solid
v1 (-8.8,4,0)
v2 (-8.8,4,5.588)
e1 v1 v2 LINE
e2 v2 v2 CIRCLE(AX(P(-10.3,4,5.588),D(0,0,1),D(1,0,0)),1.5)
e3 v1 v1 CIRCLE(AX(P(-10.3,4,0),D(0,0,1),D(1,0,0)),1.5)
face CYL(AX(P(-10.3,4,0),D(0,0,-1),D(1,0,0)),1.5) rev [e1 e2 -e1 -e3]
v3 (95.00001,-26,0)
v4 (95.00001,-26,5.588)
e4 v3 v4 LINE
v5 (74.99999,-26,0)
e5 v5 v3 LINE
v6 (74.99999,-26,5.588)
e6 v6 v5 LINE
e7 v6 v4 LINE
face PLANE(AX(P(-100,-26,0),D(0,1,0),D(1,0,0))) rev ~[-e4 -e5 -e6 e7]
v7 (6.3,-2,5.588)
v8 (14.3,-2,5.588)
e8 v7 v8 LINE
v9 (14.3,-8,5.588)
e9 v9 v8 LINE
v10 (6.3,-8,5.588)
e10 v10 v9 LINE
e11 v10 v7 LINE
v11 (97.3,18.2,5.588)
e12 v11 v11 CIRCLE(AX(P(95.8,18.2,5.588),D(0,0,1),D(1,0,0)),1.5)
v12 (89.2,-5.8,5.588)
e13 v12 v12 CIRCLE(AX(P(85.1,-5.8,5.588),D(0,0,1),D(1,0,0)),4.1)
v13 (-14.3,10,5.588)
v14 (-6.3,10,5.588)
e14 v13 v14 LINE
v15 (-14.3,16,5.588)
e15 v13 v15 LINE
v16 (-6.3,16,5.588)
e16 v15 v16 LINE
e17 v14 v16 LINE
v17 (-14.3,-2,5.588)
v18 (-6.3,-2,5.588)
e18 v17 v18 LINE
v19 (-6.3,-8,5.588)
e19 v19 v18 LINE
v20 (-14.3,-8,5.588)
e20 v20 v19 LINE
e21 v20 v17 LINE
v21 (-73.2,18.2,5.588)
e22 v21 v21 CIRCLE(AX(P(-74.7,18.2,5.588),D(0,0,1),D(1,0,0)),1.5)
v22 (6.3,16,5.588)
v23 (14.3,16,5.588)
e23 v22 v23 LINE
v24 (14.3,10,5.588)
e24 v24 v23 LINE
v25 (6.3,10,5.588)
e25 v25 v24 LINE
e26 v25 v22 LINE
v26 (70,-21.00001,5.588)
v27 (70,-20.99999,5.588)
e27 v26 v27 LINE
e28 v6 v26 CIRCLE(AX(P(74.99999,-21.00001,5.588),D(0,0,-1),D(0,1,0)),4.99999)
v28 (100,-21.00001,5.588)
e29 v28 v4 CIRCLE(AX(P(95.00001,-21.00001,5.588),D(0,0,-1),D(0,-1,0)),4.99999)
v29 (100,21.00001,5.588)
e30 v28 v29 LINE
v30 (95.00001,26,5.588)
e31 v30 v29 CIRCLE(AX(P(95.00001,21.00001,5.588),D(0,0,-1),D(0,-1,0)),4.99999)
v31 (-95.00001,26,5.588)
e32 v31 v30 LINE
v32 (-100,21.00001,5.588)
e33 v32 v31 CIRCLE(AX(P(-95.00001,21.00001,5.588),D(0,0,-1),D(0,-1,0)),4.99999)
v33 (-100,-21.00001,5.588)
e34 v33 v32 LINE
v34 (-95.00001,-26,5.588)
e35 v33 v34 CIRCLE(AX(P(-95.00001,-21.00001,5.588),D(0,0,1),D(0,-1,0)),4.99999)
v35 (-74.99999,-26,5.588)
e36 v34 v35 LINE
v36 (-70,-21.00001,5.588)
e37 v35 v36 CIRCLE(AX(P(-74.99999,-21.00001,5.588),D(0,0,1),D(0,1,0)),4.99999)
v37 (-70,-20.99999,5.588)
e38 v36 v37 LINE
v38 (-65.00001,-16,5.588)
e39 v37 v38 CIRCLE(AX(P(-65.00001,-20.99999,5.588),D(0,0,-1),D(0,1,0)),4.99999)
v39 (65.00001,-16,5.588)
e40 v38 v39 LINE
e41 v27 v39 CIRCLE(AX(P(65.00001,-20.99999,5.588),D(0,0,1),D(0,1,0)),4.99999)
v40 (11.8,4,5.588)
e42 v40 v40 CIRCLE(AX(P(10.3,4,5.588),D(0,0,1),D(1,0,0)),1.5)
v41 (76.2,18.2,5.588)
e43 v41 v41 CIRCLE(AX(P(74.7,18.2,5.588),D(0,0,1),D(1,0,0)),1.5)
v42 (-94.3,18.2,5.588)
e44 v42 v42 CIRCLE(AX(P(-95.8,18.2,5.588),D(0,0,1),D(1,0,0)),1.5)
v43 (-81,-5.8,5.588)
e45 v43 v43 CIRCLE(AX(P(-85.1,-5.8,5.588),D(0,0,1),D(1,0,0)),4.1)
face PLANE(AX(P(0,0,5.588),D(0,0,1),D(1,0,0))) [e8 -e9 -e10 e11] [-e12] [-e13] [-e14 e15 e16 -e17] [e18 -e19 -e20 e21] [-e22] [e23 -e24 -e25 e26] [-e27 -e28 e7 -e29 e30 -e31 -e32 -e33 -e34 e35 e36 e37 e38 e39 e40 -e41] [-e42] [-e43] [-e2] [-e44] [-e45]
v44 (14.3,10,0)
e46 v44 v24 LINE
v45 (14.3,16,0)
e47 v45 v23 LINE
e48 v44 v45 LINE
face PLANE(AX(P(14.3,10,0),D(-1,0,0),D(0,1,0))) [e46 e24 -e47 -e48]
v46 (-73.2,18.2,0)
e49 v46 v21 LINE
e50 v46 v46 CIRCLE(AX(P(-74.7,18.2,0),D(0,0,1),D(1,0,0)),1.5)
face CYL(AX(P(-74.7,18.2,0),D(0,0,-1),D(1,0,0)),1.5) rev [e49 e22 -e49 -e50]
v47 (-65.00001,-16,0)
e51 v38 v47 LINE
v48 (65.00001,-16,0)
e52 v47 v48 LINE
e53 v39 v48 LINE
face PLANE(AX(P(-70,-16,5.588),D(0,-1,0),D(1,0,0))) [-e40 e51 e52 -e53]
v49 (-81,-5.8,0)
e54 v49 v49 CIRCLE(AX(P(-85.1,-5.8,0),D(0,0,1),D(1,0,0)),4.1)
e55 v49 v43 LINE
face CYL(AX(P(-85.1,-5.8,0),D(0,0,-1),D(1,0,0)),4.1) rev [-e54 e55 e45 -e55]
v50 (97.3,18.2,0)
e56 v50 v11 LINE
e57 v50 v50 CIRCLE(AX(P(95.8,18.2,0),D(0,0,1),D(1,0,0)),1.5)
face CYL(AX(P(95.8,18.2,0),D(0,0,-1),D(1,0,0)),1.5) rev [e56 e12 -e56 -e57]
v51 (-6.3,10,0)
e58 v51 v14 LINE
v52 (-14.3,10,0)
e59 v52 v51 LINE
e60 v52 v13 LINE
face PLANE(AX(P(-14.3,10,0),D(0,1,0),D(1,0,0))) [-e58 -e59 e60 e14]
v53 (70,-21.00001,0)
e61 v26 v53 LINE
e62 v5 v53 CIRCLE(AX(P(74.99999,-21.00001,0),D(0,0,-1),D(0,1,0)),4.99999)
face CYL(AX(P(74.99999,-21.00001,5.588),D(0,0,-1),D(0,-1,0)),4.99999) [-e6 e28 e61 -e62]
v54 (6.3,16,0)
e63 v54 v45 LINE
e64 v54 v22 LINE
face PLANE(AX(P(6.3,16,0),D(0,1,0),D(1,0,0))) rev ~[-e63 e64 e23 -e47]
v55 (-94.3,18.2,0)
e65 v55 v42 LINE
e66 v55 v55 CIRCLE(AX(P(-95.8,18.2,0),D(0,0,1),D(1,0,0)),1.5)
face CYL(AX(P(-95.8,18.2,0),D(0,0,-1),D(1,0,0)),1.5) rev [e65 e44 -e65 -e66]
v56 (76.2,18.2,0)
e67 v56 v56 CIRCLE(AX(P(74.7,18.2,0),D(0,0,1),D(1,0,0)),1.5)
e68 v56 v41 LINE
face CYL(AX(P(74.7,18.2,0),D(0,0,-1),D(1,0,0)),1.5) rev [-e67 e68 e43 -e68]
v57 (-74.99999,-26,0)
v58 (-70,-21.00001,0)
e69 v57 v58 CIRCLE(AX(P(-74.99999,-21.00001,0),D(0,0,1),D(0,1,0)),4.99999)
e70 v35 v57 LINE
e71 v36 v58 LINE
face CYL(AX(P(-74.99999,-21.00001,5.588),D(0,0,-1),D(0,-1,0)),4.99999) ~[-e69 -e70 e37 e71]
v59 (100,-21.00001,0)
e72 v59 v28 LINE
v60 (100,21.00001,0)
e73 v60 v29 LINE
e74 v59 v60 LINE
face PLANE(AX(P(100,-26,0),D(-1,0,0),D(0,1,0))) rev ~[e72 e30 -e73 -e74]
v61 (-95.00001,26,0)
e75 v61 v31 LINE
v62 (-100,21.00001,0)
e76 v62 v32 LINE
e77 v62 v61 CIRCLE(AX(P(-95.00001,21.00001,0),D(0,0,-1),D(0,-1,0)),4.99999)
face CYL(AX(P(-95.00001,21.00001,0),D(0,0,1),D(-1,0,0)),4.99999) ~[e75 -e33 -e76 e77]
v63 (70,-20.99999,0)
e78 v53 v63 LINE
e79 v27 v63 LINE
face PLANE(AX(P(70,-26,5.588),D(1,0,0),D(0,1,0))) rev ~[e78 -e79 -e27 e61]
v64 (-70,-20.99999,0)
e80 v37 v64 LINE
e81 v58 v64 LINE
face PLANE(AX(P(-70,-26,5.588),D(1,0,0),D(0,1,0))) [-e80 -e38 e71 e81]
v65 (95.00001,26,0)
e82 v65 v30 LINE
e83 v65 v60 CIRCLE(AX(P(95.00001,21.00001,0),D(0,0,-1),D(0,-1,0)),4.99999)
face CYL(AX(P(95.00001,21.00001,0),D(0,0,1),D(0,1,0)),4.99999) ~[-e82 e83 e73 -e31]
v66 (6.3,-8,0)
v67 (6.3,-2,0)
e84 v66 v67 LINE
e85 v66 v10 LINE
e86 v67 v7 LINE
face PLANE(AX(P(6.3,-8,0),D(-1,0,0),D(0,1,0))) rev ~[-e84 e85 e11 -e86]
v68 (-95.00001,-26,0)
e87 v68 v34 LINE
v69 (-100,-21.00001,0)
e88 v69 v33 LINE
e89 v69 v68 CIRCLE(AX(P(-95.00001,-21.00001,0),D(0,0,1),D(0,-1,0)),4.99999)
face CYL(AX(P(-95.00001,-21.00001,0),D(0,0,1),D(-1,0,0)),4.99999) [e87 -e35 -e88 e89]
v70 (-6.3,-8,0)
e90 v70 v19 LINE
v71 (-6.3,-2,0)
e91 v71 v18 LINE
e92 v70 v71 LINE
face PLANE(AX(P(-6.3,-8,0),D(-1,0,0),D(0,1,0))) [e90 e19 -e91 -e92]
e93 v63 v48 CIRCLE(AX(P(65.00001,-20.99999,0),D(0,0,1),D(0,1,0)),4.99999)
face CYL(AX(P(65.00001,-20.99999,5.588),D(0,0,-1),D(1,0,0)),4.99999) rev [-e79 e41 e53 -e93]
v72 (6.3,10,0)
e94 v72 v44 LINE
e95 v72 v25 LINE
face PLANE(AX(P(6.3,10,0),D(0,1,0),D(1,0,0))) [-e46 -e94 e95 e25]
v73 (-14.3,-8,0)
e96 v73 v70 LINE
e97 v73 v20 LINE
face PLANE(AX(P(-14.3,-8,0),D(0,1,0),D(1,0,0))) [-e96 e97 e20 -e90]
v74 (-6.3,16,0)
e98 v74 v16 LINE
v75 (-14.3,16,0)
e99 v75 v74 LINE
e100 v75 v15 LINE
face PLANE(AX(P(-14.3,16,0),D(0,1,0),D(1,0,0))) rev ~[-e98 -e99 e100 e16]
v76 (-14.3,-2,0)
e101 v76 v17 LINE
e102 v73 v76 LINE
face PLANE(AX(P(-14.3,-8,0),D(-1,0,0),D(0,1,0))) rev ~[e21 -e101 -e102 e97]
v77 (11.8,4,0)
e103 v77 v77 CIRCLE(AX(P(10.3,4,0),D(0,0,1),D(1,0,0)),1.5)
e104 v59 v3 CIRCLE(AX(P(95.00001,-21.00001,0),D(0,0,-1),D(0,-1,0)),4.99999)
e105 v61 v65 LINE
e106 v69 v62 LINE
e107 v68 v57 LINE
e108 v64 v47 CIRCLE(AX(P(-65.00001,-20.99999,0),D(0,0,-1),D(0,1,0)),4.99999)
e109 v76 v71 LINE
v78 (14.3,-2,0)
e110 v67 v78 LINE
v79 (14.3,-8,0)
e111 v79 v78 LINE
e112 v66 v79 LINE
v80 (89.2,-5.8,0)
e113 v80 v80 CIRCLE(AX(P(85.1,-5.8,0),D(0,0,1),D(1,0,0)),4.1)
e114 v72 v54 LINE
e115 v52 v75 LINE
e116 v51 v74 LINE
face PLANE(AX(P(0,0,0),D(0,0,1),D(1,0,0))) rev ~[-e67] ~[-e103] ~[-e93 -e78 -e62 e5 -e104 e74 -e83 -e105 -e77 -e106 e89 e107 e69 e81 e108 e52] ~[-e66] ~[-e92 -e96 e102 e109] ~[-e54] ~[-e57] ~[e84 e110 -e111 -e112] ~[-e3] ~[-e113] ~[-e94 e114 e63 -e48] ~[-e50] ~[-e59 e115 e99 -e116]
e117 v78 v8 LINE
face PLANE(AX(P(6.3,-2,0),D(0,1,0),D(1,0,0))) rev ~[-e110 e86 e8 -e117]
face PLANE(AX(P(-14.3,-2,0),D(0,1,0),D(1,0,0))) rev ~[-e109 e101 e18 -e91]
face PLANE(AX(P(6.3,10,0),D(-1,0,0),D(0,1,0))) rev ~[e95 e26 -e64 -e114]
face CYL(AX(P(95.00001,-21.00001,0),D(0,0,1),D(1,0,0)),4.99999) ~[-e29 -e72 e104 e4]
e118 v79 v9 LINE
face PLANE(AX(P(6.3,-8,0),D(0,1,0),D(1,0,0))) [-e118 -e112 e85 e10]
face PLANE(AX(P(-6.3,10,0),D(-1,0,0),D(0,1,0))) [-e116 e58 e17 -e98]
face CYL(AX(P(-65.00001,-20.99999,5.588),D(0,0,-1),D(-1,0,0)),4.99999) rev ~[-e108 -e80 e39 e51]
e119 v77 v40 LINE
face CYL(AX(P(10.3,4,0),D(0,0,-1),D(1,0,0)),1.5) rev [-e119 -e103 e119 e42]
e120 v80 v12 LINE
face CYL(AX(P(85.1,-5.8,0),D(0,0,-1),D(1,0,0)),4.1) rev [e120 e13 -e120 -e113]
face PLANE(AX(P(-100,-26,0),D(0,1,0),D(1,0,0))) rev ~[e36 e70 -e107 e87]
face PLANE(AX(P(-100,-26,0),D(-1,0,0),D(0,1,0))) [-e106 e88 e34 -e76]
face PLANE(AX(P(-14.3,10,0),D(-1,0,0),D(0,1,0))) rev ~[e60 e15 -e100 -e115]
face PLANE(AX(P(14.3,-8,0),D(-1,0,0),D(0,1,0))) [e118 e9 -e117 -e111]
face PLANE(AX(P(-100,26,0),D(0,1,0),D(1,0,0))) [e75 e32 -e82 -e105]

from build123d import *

# Parameters (mm, degrees)
F0_W     = 200
F0_H     = 52
F0_R     = 4.1
F0_W_2   = 8
F0_H_2   = 6
F0_R_2   = 1.5
F1_DEPTH = 5.588
F2_W     = 140
F2_H     = 10
F3_DEPTH = 25
F4_R     = 4.99999


# Not quite as in the source:
# - a fillet or chamfer is up to 0.001 mm smaller than in the source, because OpenCascade refuses the exact size


with BuildPart() as f1:
    # F0 (on Top) → F1 (new body)
    with BuildSketch(Plane.XY):
        Rectangle(F0_W, F0_H)
        with Locations((-85.1, -5.8)):
            Circle(F0_R, mode=Mode.SUBTRACT)
        with Locations((-10.3, -5)):
            Rectangle(F0_W_2, F0_H_2, mode=Mode.SUBTRACT)
        with Locations((10.3, -5)):
            Rectangle(F0_W_2, F0_H_2, mode=Mode.SUBTRACT)
        with Locations((85.1, -5.8)):
            Circle(F0_R, mode=Mode.SUBTRACT)
        with Locations((-10.3, 4)):
            Circle(F0_R_2, mode=Mode.SUBTRACT)
        with Locations((-95.8, 18.2)):
            Circle(F0_R_2, mode=Mode.SUBTRACT)
        with Locations((-74.7, 18.2)):
            Circle(F0_R_2, mode=Mode.SUBTRACT)
        with Locations((-10.3, 13)):
            Rectangle(F0_W_2, F0_H_2, mode=Mode.SUBTRACT)
        with Locations((10.3, 4)):
            Circle(F0_R_2, mode=Mode.SUBTRACT)
        with Locations((10.3, 13)):
            Rectangle(F0_W_2, F0_H_2, mode=Mode.SUBTRACT)
        with Locations((74.7, 18.2)):
            Circle(F0_R_2, mode=Mode.SUBTRACT)
        with Locations((95.8, 18.2)):
            Circle(F0_R_2, mode=Mode.SUBTRACT)
    extrude(amount=F1_DEPTH)

    # F2 (on face) → F3 (cut)
    with BuildSketch(Plane.XY.offset(5.588)):
        with Locations((0, -21)):
            Rectangle(F2_W, F2_H)
    extrude(amount=-F3_DEPTH, mode=Mode.SUBTRACT)

    # F4 (radius 5 in the source; OpenCascade refuses exactly that, so slightly less here)
    f4_edges = [f1.edges().sort_by_distance(p)[0] for p in [
        (-100, 26, 2.794),
        (-100, -26, 2.794),
        (-70, -26, 2.794),
        (-70, -16, 2.794),
        (70, -16, 2.794),
        (70, -26, 2.794),
        (100, -26, 2.794),
        (100, 26, 2.794),
    ]]
    fillet(f4_edges, radius=F4_R)


solid = f1.part
